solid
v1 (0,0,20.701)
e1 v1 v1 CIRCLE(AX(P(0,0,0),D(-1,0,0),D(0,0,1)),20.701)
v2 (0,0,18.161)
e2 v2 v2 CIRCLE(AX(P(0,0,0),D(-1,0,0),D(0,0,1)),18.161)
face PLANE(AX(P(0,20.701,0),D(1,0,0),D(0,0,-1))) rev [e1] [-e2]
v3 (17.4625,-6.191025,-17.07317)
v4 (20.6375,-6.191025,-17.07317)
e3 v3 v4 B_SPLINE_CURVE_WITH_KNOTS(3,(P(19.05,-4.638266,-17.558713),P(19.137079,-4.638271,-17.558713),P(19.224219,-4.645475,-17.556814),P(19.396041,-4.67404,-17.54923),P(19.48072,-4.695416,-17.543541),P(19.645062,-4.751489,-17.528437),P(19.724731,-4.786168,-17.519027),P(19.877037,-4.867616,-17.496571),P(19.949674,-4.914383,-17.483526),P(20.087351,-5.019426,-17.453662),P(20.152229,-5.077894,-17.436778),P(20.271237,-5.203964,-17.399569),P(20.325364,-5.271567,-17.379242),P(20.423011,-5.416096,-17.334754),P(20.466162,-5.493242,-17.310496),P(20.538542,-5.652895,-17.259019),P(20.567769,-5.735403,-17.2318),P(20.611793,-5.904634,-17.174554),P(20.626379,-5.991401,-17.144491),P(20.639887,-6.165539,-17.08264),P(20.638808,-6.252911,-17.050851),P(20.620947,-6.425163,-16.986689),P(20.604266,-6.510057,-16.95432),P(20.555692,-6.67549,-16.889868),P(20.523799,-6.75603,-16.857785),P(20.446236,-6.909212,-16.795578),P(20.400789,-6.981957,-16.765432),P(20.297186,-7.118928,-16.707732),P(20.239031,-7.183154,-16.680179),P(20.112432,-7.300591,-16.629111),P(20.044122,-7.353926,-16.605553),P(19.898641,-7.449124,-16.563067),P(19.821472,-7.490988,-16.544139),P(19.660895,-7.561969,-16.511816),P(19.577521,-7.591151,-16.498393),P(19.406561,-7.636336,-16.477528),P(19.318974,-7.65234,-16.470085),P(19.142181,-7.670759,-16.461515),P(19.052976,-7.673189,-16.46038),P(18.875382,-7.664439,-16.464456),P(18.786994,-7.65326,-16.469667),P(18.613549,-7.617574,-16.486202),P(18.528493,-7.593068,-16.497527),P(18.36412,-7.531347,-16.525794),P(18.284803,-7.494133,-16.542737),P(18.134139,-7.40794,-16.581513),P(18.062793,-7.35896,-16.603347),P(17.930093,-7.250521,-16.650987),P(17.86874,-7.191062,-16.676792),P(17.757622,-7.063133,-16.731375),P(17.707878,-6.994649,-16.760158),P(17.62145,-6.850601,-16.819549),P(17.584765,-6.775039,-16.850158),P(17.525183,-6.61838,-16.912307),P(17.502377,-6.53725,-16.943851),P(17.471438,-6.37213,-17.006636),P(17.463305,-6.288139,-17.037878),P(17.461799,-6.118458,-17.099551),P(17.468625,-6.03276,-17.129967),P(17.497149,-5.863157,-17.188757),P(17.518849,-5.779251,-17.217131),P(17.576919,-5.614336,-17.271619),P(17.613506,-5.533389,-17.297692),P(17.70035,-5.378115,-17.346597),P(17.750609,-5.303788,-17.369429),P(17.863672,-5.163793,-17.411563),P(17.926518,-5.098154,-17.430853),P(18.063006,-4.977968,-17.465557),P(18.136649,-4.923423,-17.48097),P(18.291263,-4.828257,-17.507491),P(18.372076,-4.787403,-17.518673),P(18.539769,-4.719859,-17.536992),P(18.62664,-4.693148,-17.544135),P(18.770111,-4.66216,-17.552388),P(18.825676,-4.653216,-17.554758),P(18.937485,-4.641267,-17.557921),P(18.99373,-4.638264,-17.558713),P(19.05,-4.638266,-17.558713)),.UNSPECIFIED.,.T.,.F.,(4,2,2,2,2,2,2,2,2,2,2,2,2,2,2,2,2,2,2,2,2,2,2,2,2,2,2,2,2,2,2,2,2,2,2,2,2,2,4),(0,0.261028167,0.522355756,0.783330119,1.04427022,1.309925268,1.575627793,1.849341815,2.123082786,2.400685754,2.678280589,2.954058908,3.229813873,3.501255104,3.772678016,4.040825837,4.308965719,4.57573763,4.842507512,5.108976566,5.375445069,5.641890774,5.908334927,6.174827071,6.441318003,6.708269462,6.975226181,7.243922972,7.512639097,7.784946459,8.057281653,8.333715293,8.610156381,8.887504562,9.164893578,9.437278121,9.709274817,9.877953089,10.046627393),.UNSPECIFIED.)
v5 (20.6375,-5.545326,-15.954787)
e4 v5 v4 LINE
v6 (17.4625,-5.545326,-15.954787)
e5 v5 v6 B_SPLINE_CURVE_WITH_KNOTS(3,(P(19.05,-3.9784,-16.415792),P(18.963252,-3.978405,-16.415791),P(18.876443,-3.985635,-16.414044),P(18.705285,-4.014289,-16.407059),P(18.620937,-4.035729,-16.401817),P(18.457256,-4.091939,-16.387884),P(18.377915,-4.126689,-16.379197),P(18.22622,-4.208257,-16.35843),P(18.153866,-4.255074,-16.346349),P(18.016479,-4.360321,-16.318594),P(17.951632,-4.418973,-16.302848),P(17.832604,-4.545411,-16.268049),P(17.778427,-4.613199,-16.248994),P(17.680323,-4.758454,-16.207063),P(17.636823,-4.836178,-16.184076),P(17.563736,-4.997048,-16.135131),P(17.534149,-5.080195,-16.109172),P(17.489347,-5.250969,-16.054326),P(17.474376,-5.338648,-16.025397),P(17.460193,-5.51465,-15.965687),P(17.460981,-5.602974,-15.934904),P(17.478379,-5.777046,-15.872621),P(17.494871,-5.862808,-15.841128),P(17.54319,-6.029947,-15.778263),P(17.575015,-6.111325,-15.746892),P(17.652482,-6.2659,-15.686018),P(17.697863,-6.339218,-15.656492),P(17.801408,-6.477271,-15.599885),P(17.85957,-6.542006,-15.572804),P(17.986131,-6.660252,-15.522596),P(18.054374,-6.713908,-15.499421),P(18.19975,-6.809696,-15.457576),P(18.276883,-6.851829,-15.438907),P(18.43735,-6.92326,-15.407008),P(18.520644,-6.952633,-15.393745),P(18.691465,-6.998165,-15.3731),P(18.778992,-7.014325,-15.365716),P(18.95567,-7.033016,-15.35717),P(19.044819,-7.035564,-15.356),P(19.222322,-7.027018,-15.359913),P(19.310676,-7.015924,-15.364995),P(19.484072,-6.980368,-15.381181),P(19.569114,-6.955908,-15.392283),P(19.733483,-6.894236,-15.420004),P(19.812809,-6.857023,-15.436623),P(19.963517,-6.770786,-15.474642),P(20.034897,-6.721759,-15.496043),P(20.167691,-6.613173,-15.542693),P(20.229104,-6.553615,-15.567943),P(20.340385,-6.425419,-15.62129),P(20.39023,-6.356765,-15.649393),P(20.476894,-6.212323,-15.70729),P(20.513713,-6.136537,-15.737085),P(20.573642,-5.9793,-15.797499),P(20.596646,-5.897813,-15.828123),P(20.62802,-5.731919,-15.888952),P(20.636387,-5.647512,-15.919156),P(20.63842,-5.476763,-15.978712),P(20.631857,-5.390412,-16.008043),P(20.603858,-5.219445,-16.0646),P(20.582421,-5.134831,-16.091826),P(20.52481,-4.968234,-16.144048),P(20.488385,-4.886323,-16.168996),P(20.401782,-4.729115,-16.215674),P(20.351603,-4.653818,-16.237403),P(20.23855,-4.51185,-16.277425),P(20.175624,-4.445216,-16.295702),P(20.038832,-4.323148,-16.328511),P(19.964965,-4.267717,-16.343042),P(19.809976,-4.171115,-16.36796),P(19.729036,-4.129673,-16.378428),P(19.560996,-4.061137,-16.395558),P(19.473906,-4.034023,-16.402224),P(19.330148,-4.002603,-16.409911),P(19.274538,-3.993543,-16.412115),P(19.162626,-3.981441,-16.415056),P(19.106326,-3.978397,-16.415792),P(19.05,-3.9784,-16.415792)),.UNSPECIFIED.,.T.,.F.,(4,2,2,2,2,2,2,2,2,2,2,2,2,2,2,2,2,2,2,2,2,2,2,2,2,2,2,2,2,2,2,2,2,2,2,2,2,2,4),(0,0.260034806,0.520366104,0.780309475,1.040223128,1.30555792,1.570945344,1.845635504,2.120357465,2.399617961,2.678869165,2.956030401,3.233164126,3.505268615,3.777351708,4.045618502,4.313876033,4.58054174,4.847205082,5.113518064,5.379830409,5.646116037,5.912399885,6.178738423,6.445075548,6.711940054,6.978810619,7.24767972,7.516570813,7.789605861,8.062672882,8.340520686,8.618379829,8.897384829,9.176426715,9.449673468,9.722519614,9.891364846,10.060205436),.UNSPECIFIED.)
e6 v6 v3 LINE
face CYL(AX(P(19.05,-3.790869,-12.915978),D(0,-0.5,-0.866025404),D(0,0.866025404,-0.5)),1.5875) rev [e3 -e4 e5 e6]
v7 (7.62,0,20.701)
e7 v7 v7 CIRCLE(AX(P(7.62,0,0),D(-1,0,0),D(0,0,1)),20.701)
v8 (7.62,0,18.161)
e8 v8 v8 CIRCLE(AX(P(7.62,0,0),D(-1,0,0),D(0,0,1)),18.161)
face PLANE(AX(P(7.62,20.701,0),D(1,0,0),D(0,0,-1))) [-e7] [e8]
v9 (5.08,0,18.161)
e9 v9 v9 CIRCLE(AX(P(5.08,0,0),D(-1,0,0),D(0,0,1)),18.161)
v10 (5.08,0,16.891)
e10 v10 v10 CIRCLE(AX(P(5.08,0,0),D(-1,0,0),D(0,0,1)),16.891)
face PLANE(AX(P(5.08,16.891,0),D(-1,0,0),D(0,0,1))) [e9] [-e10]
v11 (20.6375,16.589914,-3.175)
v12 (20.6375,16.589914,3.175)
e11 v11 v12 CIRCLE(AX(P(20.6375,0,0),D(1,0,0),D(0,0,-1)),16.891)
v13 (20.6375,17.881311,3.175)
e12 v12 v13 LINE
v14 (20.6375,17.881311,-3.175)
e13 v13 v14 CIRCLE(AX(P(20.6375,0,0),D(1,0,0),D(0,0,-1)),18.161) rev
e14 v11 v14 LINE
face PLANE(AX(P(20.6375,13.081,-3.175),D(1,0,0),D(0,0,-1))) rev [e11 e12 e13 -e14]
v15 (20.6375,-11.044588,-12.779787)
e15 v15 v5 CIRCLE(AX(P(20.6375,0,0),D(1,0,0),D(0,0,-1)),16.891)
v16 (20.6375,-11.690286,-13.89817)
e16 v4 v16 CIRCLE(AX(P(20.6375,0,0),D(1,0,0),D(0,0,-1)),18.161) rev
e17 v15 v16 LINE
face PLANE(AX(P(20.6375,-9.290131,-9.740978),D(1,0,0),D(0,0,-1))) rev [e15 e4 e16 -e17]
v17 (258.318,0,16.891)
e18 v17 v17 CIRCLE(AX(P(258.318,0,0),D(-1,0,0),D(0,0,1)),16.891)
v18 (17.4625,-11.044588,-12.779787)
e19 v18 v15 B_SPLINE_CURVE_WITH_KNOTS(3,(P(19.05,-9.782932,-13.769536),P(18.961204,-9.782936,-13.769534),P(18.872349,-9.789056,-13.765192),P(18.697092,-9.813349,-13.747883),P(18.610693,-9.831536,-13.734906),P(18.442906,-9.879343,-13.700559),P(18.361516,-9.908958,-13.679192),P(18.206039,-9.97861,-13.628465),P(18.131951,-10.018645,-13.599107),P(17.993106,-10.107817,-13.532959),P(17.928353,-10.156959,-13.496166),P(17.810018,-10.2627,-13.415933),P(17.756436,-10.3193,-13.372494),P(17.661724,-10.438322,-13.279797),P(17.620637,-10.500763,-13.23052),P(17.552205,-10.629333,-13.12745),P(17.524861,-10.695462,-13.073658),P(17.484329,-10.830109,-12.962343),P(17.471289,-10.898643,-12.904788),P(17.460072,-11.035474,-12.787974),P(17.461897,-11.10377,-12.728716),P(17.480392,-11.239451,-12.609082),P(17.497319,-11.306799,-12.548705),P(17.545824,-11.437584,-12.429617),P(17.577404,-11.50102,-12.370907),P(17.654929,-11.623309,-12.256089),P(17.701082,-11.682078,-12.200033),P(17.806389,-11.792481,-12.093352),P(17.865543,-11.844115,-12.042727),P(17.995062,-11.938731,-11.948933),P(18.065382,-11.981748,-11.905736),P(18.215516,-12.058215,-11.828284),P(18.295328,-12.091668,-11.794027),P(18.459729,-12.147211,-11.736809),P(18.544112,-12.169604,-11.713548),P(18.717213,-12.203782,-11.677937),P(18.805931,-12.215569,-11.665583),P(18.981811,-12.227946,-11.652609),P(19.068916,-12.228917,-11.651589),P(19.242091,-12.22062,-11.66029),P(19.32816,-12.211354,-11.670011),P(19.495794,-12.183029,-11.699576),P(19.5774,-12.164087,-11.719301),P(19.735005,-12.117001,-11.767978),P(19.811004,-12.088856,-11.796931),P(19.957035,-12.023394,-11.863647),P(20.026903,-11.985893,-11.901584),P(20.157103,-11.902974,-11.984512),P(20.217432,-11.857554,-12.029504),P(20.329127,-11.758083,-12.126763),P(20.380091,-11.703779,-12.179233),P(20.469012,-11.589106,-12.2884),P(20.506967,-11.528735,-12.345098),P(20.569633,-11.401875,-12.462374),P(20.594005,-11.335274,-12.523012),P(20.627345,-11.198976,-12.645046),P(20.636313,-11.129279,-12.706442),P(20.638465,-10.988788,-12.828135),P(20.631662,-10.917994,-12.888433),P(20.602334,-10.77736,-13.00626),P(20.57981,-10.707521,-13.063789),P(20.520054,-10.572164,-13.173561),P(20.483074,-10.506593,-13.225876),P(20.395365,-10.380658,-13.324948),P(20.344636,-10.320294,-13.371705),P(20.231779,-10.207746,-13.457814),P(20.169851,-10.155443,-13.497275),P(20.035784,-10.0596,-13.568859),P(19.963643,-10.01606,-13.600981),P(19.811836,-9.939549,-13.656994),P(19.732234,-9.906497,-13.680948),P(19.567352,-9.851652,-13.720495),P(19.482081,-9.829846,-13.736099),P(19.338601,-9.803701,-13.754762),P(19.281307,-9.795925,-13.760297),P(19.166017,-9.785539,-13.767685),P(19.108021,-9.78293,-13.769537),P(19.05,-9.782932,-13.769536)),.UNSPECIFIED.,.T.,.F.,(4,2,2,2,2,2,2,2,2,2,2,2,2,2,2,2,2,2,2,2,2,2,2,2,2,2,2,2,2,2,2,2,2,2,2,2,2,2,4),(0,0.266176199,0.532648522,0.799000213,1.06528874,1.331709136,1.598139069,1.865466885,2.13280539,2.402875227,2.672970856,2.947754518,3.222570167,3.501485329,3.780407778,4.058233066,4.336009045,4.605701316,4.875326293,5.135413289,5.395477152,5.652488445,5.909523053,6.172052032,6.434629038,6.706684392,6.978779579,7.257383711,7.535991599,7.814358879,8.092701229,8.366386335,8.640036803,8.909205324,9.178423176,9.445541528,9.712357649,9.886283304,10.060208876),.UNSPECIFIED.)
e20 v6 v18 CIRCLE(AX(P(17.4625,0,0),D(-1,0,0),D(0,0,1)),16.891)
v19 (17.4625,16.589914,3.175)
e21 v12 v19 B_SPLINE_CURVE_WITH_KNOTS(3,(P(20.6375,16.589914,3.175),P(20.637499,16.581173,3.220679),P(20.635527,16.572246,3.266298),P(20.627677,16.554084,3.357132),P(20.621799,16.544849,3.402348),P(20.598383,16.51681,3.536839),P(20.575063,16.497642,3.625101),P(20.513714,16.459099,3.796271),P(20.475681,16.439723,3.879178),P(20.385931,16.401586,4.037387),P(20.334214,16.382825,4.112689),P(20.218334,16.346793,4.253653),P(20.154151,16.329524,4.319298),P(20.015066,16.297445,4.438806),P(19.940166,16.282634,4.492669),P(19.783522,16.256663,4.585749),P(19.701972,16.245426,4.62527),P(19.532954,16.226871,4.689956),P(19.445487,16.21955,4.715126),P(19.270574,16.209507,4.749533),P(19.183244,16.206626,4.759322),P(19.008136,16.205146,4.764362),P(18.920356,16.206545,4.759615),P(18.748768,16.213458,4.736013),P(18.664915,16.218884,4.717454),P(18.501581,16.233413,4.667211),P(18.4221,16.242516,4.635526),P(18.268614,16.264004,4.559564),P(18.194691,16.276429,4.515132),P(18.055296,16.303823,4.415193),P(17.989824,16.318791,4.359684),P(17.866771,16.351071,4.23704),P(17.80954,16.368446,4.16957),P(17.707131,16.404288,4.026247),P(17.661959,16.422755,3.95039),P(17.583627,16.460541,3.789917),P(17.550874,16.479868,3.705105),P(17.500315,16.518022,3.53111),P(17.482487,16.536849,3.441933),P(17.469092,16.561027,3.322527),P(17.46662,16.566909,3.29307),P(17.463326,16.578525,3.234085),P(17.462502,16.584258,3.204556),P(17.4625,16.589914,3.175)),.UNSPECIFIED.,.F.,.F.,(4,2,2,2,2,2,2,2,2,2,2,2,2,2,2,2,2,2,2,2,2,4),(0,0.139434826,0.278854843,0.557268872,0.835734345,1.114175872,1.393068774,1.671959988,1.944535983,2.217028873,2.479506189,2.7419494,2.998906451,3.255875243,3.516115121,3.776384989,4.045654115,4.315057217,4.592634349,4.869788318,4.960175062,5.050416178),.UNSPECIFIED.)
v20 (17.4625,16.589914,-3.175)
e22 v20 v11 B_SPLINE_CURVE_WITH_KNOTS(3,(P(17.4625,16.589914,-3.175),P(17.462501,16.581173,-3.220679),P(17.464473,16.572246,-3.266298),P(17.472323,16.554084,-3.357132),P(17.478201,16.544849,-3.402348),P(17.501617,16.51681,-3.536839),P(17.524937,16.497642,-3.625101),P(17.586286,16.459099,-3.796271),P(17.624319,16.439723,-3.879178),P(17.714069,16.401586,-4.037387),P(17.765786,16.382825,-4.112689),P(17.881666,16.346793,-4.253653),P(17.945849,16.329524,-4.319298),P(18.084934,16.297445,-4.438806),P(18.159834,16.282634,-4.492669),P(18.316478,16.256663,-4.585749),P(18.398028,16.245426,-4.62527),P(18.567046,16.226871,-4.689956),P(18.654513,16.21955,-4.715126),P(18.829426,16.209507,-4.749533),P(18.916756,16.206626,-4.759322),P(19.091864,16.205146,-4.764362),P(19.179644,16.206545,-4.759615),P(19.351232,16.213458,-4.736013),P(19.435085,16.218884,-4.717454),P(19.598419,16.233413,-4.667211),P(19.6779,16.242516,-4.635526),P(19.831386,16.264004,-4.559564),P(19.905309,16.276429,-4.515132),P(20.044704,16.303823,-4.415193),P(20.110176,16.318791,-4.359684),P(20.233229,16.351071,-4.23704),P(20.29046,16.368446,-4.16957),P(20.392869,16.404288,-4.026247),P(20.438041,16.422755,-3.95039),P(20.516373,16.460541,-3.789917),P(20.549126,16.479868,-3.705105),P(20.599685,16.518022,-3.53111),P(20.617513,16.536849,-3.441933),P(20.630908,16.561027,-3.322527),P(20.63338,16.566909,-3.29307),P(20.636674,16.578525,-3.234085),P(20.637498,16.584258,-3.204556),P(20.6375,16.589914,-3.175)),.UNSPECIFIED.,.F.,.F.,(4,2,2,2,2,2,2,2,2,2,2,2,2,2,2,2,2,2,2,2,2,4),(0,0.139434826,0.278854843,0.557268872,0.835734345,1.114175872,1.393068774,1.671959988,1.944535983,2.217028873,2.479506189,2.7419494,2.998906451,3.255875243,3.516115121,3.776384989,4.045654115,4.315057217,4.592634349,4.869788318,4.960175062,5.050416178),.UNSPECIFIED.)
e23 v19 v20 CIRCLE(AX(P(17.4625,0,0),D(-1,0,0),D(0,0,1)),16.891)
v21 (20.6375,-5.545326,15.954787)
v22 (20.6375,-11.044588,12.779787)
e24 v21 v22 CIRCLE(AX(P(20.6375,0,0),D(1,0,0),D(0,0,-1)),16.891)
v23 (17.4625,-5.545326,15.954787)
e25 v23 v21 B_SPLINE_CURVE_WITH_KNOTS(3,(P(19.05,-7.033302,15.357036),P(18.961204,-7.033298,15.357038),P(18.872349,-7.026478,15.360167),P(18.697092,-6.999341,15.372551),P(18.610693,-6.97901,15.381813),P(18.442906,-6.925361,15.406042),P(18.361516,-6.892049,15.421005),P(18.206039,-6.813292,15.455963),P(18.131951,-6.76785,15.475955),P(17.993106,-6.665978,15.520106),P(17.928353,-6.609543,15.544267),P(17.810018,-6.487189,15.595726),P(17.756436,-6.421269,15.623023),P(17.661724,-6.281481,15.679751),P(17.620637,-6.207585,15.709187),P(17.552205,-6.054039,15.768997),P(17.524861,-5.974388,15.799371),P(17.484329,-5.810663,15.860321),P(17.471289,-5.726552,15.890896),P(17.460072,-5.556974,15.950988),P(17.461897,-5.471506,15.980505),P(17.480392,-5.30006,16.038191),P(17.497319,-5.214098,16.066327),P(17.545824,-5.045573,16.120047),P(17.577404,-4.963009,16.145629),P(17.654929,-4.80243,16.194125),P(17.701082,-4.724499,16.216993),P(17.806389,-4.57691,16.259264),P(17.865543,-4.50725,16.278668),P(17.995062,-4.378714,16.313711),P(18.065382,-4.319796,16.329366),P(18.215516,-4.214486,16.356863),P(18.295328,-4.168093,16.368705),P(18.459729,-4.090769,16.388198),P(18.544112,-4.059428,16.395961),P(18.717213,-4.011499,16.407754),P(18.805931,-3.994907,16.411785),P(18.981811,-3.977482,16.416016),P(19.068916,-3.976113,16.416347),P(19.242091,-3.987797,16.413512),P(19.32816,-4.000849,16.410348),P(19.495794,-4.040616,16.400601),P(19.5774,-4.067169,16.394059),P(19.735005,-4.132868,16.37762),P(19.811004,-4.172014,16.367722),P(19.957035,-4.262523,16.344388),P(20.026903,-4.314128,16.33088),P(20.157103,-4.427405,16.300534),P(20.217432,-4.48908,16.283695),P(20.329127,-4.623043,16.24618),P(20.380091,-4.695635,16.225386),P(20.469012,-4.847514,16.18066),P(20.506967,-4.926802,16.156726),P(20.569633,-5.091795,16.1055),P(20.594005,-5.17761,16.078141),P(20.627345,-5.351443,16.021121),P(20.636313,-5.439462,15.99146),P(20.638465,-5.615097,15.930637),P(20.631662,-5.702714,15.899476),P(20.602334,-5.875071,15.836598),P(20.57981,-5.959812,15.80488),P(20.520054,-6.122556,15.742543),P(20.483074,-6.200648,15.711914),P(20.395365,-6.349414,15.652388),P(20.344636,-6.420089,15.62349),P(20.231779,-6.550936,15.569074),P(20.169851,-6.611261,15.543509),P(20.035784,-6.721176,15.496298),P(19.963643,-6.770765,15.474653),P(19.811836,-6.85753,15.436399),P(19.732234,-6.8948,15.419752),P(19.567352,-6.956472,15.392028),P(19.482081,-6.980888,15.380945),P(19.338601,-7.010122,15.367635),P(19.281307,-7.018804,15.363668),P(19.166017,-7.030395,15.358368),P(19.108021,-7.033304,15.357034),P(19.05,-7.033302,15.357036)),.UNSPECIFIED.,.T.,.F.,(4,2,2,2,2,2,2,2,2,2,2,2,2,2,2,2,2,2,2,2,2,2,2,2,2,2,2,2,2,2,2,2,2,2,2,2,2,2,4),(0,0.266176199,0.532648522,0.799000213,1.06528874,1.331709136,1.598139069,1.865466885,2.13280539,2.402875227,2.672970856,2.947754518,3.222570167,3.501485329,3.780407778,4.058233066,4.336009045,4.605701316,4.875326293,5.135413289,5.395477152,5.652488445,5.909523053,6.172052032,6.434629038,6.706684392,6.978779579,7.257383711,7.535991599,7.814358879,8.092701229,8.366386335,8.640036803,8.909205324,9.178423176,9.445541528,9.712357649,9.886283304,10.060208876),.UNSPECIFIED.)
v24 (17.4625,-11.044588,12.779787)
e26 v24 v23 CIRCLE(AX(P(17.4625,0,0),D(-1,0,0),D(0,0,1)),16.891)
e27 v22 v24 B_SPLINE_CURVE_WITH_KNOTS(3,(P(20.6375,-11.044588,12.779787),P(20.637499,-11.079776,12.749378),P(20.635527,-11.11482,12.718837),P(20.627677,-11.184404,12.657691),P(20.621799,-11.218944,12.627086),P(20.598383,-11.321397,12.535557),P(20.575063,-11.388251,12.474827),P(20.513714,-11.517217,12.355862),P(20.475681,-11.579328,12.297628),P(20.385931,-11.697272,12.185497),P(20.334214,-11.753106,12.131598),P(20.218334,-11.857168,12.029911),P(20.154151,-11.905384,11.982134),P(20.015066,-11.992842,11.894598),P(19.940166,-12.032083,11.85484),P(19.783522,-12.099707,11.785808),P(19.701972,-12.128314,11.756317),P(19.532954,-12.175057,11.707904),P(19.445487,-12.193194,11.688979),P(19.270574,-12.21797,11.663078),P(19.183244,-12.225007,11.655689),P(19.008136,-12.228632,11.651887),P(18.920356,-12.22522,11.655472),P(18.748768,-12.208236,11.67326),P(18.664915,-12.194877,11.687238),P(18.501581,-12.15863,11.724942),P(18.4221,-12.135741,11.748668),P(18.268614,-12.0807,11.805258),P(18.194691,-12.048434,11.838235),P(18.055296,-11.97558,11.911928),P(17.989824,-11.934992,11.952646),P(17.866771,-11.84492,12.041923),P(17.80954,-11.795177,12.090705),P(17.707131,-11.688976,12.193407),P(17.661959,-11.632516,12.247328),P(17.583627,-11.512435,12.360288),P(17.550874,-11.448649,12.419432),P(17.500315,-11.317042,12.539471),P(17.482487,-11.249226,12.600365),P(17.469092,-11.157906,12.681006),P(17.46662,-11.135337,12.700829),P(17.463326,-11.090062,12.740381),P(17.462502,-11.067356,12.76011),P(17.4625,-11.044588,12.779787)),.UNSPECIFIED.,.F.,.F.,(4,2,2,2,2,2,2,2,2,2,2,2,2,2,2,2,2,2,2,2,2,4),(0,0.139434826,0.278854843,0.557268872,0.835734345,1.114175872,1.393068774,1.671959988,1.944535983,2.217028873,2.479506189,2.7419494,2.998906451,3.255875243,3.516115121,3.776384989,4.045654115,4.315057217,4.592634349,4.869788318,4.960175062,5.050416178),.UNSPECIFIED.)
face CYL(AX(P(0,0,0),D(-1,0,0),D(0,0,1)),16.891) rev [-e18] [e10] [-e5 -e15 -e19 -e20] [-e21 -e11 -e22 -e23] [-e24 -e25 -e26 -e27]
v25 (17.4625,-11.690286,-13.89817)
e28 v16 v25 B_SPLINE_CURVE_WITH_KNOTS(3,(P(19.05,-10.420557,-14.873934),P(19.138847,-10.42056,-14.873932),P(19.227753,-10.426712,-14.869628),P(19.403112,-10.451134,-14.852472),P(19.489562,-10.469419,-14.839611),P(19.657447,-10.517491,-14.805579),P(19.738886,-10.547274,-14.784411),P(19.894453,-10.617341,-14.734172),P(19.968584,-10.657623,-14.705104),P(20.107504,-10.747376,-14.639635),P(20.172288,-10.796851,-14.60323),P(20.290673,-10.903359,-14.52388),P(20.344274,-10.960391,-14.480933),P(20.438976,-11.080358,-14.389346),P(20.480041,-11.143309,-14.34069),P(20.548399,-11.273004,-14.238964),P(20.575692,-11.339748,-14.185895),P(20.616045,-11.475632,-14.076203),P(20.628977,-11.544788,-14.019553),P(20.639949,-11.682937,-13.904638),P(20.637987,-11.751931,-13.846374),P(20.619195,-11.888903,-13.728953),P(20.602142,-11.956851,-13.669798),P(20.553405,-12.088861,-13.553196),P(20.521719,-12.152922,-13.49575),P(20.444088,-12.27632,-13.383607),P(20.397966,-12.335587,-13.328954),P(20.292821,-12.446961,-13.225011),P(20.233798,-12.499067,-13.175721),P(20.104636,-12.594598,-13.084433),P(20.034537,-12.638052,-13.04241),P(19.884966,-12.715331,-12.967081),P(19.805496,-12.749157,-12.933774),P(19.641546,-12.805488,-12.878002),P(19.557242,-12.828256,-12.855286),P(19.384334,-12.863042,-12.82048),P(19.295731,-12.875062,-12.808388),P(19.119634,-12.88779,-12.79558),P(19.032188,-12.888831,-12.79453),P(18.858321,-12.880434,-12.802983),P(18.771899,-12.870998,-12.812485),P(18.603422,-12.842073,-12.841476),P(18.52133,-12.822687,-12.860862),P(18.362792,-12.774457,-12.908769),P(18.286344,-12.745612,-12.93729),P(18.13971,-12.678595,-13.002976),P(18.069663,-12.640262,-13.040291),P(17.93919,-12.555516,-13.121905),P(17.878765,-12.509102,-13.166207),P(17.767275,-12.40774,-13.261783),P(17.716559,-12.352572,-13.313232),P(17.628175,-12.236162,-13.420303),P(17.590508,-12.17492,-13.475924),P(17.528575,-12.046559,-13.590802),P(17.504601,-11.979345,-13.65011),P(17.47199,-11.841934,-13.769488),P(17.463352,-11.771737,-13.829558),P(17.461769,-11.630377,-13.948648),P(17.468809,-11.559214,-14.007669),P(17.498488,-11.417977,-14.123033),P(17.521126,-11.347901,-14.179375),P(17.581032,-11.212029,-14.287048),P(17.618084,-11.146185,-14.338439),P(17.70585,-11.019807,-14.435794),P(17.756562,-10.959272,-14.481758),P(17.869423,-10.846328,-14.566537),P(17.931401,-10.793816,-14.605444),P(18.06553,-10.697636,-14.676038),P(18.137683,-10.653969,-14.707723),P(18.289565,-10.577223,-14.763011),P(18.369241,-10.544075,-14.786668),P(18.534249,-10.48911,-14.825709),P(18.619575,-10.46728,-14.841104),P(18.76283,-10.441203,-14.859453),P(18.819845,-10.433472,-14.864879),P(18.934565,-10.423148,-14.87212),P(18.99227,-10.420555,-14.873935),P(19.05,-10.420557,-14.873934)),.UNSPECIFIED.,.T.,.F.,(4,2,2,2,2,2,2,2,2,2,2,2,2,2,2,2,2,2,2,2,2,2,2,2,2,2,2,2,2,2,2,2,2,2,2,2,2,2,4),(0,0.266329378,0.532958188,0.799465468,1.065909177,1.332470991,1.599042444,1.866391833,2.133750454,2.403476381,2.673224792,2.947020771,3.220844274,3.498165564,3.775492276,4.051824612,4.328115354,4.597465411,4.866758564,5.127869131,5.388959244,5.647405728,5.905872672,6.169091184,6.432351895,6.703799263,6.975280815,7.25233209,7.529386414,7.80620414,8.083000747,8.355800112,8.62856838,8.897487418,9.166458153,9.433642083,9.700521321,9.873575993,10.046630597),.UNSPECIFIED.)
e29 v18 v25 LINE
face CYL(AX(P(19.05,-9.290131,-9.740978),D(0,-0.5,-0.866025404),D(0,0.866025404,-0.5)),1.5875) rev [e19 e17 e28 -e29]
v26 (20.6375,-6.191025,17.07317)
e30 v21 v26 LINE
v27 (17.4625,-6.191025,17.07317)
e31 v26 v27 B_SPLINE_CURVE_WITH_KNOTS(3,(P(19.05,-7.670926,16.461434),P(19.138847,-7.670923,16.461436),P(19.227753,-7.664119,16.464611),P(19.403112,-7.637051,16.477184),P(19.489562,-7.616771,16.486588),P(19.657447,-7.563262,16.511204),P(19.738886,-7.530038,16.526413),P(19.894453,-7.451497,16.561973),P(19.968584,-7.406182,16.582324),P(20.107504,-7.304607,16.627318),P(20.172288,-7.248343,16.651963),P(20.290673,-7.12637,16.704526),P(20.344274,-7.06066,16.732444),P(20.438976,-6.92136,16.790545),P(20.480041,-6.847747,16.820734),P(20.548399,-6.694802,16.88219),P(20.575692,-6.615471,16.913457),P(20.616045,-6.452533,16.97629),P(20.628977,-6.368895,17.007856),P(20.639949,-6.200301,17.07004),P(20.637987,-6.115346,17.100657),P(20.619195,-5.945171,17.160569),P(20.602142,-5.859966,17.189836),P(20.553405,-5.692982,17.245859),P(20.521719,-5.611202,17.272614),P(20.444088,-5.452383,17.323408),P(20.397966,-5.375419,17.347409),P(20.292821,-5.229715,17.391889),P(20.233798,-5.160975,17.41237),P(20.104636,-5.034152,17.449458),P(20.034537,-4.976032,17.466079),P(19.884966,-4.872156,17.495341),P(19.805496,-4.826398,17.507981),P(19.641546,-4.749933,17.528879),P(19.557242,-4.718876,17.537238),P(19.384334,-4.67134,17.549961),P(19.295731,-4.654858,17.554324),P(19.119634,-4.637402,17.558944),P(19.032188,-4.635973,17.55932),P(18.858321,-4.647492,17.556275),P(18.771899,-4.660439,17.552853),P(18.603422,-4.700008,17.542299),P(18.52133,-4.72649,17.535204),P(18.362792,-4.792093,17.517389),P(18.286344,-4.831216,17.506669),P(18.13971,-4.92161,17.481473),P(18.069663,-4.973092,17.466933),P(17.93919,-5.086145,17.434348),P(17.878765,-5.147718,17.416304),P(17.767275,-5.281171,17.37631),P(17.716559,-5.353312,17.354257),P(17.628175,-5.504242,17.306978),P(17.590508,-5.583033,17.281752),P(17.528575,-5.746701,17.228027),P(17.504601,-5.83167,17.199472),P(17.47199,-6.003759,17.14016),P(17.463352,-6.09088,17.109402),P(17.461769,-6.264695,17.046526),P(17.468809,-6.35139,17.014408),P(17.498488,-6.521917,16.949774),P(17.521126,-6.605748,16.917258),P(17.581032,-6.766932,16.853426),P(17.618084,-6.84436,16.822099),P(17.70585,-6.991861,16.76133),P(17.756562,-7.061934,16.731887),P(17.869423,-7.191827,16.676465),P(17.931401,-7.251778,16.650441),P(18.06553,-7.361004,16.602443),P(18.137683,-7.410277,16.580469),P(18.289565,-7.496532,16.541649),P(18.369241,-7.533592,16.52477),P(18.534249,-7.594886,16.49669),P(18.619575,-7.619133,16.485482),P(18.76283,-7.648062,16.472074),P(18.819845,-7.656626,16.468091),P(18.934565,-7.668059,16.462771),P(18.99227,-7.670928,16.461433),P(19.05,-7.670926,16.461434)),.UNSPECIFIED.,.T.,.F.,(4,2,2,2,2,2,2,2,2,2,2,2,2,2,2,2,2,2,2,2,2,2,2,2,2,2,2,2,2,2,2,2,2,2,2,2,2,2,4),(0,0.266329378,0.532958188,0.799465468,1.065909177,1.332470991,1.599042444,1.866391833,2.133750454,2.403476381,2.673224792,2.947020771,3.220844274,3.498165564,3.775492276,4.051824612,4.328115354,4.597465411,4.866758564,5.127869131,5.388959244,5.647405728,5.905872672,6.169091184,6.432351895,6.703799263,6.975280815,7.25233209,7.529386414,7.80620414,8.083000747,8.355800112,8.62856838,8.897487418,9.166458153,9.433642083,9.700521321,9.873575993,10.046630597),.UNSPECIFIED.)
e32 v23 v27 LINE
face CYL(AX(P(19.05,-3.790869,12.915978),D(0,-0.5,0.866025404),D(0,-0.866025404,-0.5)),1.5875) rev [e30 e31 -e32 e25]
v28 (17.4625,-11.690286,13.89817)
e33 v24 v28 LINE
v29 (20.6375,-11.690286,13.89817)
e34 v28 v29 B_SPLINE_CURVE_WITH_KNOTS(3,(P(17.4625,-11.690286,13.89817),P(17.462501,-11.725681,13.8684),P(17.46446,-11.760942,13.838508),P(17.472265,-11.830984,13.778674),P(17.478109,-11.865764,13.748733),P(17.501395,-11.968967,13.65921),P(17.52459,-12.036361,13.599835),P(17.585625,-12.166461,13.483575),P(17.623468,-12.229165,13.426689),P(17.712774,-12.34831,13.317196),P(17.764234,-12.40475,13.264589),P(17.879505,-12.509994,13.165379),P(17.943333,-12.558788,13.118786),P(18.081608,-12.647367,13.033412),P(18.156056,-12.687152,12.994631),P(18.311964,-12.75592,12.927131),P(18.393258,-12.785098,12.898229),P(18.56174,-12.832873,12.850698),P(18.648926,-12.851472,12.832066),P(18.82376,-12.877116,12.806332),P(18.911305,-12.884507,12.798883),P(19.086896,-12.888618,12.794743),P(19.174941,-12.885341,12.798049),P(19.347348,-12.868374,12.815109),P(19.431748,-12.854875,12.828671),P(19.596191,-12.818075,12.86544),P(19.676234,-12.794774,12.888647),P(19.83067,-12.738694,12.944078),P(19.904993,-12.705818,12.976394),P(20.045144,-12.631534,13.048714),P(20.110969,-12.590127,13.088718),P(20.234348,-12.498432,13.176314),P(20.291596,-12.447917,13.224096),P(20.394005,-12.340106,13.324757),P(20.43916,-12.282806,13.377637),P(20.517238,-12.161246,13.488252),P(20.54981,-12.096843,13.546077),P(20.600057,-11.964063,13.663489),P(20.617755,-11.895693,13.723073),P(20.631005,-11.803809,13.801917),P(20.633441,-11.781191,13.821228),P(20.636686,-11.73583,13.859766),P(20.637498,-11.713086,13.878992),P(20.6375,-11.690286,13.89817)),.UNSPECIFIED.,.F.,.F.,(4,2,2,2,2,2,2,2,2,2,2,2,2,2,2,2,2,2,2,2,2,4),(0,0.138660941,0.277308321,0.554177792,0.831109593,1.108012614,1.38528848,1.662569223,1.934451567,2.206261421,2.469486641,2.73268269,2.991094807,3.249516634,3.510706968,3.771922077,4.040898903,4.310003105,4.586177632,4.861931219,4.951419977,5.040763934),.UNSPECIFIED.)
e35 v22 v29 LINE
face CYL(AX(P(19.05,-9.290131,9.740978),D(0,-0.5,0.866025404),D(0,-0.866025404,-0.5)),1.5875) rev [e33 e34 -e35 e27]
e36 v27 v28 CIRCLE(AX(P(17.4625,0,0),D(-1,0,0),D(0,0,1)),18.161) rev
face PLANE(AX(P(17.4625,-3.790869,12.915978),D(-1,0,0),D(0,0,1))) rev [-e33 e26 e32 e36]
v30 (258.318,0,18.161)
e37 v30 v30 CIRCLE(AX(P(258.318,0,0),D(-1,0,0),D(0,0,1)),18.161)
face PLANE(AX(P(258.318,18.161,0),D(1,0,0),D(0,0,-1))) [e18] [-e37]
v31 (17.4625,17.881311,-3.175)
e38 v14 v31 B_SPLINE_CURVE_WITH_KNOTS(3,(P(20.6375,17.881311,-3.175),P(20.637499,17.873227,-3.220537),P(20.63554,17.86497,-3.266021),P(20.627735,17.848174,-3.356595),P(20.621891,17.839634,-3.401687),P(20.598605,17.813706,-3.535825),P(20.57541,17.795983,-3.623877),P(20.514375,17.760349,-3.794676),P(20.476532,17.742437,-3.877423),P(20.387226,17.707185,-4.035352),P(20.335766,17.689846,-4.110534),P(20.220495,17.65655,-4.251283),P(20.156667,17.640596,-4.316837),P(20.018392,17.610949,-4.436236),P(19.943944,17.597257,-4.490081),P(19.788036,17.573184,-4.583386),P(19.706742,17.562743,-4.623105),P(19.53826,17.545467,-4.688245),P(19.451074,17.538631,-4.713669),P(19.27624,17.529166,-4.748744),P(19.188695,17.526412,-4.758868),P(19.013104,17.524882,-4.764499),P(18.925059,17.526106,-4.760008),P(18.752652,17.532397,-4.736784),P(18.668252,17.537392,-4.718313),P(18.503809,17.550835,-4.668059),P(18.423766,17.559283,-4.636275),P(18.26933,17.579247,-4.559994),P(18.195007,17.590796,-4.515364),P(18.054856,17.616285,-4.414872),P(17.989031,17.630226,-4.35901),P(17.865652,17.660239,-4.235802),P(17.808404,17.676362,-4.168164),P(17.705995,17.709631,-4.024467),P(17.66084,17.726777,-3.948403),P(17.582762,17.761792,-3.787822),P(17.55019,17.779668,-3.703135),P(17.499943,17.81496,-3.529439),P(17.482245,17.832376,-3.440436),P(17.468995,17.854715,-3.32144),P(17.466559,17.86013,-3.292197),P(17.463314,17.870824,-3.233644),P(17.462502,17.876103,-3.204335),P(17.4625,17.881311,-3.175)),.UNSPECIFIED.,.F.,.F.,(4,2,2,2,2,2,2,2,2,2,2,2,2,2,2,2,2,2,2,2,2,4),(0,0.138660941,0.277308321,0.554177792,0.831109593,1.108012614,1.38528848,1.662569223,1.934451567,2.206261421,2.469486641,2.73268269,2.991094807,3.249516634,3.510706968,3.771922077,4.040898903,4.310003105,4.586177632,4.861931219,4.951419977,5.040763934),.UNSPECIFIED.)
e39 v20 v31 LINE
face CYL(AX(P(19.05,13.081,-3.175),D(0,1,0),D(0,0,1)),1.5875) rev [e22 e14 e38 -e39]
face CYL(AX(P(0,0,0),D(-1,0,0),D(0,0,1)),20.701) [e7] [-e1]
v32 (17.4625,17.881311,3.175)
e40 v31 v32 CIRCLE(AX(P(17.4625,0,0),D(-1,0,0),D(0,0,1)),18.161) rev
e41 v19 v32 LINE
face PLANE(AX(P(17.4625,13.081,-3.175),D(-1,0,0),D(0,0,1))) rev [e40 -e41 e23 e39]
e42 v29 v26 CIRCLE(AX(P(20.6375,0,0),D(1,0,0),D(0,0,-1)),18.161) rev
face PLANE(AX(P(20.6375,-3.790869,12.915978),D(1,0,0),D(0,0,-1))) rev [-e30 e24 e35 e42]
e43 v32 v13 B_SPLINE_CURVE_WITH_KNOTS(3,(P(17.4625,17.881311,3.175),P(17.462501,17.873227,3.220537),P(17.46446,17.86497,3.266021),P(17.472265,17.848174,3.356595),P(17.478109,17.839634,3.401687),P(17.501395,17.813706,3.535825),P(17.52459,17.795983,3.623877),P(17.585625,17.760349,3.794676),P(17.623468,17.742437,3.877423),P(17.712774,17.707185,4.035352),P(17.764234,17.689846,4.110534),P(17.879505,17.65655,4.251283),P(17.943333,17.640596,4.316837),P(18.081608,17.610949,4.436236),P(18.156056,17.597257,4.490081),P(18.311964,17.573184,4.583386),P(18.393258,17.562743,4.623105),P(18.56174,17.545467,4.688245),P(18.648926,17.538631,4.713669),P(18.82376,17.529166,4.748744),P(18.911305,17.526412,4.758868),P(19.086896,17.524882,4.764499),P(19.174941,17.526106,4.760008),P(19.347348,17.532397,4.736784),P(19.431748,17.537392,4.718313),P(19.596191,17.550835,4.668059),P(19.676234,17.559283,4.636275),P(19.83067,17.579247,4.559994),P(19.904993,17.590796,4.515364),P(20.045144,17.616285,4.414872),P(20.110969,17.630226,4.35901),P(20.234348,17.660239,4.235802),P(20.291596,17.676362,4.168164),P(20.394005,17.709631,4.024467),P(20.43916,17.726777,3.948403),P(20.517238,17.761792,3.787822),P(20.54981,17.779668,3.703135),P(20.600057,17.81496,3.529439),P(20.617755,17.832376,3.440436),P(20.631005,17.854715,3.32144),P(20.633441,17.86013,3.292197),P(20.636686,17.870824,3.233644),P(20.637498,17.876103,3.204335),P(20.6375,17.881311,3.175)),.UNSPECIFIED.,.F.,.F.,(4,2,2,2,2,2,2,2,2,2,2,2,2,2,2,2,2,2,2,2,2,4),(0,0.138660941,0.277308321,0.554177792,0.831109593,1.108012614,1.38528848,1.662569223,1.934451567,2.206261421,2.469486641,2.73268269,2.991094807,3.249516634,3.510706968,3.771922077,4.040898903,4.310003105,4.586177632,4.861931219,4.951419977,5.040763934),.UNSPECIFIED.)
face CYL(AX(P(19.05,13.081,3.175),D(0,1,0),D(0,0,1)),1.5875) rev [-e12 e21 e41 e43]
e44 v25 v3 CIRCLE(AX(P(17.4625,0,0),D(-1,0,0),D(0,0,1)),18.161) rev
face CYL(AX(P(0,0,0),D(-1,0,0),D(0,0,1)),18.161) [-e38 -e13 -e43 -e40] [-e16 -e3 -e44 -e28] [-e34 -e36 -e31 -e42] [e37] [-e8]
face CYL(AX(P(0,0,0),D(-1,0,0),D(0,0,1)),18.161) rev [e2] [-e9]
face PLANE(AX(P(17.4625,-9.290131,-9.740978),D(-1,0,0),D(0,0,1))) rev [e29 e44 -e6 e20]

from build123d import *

# Parameters (mm, degrees)
REVOLVE1_START         = 5.08
REVOLVE1_OUTLINE_R     = 18.161
REVOLVE1_OUTLINE_R_2   = 16.891
REVOLVE1_DEPTH         = 253.238
REVOLVE1_2_OUTLINE_R   = 20.701
REVOLVE1_2_OUTLINE_R_2 = 18.161
REVOLVE1_2_DEPTH       = 7.62
CUT_EXTRUDE1_DEPTH     = 5.08
CIRPATTERN1_COUNT      = 3


# Read off the part's stored shape, not the designer's step: Revolve1
with BuildPart() as part:
    # Revolve1 outline → Revolve1 (new body)
    with BuildSketch(Plane.YZ.offset(REVOLVE1_START)):
        Circle(REVOLVE1_OUTLINE_R)
        Circle(REVOLVE1_OUTLINE_R_2, mode=Mode.SUBTRACT)
    extrude(amount=REVOLVE1_DEPTH)

    # Revolve1 2 outline → Revolve1 2 (add)
    with BuildSketch(Plane.YZ):
        Circle(REVOLVE1_2_OUTLINE_R)
        Circle(REVOLVE1_2_OUTLINE_R_2, mode=Mode.SUBTRACT)
    extrude(amount=REVOLVE1_2_DEPTH)

    # Sketch2 → Cut-Extrude1 (cut)
    with BuildSketch(Plane(origin=(0, 18.161, 0), x_dir=(1, 0, 0), z_dir=(0, 1, 0))):
        with BuildLine():
            Line((20.6375, 3.175), (20.6375, -3.175))
            ThreePointArc((20.6375, -3.175), (19.05, -4.7625), (17.4625, -3.175))
            Line((17.4625, -3.175), (17.4625, 3.175))
            ThreePointArc((17.4625, 3.175), (19.05, 4.7625), (20.6375, 3.175))
        make_face()
    cut_extrude1 = extrude(amount=-CUT_EXTRUDE1_DEPTH, mode=Mode.SUBTRACT)

    # CirPattern1: Cut-Extrude1 ×3 about axis
    cirpattern1_axis = Axis((0, 0, 0), (-1, 0, 0))
    for i in range(1, CIRPATTERN1_COUNT):
        add(cut_extrude1.rotate(cirpattern1_axis, i * 360 / CIRPATTERN1_COUNT), mode=Mode.SUBTRACT)


solid = part.part
